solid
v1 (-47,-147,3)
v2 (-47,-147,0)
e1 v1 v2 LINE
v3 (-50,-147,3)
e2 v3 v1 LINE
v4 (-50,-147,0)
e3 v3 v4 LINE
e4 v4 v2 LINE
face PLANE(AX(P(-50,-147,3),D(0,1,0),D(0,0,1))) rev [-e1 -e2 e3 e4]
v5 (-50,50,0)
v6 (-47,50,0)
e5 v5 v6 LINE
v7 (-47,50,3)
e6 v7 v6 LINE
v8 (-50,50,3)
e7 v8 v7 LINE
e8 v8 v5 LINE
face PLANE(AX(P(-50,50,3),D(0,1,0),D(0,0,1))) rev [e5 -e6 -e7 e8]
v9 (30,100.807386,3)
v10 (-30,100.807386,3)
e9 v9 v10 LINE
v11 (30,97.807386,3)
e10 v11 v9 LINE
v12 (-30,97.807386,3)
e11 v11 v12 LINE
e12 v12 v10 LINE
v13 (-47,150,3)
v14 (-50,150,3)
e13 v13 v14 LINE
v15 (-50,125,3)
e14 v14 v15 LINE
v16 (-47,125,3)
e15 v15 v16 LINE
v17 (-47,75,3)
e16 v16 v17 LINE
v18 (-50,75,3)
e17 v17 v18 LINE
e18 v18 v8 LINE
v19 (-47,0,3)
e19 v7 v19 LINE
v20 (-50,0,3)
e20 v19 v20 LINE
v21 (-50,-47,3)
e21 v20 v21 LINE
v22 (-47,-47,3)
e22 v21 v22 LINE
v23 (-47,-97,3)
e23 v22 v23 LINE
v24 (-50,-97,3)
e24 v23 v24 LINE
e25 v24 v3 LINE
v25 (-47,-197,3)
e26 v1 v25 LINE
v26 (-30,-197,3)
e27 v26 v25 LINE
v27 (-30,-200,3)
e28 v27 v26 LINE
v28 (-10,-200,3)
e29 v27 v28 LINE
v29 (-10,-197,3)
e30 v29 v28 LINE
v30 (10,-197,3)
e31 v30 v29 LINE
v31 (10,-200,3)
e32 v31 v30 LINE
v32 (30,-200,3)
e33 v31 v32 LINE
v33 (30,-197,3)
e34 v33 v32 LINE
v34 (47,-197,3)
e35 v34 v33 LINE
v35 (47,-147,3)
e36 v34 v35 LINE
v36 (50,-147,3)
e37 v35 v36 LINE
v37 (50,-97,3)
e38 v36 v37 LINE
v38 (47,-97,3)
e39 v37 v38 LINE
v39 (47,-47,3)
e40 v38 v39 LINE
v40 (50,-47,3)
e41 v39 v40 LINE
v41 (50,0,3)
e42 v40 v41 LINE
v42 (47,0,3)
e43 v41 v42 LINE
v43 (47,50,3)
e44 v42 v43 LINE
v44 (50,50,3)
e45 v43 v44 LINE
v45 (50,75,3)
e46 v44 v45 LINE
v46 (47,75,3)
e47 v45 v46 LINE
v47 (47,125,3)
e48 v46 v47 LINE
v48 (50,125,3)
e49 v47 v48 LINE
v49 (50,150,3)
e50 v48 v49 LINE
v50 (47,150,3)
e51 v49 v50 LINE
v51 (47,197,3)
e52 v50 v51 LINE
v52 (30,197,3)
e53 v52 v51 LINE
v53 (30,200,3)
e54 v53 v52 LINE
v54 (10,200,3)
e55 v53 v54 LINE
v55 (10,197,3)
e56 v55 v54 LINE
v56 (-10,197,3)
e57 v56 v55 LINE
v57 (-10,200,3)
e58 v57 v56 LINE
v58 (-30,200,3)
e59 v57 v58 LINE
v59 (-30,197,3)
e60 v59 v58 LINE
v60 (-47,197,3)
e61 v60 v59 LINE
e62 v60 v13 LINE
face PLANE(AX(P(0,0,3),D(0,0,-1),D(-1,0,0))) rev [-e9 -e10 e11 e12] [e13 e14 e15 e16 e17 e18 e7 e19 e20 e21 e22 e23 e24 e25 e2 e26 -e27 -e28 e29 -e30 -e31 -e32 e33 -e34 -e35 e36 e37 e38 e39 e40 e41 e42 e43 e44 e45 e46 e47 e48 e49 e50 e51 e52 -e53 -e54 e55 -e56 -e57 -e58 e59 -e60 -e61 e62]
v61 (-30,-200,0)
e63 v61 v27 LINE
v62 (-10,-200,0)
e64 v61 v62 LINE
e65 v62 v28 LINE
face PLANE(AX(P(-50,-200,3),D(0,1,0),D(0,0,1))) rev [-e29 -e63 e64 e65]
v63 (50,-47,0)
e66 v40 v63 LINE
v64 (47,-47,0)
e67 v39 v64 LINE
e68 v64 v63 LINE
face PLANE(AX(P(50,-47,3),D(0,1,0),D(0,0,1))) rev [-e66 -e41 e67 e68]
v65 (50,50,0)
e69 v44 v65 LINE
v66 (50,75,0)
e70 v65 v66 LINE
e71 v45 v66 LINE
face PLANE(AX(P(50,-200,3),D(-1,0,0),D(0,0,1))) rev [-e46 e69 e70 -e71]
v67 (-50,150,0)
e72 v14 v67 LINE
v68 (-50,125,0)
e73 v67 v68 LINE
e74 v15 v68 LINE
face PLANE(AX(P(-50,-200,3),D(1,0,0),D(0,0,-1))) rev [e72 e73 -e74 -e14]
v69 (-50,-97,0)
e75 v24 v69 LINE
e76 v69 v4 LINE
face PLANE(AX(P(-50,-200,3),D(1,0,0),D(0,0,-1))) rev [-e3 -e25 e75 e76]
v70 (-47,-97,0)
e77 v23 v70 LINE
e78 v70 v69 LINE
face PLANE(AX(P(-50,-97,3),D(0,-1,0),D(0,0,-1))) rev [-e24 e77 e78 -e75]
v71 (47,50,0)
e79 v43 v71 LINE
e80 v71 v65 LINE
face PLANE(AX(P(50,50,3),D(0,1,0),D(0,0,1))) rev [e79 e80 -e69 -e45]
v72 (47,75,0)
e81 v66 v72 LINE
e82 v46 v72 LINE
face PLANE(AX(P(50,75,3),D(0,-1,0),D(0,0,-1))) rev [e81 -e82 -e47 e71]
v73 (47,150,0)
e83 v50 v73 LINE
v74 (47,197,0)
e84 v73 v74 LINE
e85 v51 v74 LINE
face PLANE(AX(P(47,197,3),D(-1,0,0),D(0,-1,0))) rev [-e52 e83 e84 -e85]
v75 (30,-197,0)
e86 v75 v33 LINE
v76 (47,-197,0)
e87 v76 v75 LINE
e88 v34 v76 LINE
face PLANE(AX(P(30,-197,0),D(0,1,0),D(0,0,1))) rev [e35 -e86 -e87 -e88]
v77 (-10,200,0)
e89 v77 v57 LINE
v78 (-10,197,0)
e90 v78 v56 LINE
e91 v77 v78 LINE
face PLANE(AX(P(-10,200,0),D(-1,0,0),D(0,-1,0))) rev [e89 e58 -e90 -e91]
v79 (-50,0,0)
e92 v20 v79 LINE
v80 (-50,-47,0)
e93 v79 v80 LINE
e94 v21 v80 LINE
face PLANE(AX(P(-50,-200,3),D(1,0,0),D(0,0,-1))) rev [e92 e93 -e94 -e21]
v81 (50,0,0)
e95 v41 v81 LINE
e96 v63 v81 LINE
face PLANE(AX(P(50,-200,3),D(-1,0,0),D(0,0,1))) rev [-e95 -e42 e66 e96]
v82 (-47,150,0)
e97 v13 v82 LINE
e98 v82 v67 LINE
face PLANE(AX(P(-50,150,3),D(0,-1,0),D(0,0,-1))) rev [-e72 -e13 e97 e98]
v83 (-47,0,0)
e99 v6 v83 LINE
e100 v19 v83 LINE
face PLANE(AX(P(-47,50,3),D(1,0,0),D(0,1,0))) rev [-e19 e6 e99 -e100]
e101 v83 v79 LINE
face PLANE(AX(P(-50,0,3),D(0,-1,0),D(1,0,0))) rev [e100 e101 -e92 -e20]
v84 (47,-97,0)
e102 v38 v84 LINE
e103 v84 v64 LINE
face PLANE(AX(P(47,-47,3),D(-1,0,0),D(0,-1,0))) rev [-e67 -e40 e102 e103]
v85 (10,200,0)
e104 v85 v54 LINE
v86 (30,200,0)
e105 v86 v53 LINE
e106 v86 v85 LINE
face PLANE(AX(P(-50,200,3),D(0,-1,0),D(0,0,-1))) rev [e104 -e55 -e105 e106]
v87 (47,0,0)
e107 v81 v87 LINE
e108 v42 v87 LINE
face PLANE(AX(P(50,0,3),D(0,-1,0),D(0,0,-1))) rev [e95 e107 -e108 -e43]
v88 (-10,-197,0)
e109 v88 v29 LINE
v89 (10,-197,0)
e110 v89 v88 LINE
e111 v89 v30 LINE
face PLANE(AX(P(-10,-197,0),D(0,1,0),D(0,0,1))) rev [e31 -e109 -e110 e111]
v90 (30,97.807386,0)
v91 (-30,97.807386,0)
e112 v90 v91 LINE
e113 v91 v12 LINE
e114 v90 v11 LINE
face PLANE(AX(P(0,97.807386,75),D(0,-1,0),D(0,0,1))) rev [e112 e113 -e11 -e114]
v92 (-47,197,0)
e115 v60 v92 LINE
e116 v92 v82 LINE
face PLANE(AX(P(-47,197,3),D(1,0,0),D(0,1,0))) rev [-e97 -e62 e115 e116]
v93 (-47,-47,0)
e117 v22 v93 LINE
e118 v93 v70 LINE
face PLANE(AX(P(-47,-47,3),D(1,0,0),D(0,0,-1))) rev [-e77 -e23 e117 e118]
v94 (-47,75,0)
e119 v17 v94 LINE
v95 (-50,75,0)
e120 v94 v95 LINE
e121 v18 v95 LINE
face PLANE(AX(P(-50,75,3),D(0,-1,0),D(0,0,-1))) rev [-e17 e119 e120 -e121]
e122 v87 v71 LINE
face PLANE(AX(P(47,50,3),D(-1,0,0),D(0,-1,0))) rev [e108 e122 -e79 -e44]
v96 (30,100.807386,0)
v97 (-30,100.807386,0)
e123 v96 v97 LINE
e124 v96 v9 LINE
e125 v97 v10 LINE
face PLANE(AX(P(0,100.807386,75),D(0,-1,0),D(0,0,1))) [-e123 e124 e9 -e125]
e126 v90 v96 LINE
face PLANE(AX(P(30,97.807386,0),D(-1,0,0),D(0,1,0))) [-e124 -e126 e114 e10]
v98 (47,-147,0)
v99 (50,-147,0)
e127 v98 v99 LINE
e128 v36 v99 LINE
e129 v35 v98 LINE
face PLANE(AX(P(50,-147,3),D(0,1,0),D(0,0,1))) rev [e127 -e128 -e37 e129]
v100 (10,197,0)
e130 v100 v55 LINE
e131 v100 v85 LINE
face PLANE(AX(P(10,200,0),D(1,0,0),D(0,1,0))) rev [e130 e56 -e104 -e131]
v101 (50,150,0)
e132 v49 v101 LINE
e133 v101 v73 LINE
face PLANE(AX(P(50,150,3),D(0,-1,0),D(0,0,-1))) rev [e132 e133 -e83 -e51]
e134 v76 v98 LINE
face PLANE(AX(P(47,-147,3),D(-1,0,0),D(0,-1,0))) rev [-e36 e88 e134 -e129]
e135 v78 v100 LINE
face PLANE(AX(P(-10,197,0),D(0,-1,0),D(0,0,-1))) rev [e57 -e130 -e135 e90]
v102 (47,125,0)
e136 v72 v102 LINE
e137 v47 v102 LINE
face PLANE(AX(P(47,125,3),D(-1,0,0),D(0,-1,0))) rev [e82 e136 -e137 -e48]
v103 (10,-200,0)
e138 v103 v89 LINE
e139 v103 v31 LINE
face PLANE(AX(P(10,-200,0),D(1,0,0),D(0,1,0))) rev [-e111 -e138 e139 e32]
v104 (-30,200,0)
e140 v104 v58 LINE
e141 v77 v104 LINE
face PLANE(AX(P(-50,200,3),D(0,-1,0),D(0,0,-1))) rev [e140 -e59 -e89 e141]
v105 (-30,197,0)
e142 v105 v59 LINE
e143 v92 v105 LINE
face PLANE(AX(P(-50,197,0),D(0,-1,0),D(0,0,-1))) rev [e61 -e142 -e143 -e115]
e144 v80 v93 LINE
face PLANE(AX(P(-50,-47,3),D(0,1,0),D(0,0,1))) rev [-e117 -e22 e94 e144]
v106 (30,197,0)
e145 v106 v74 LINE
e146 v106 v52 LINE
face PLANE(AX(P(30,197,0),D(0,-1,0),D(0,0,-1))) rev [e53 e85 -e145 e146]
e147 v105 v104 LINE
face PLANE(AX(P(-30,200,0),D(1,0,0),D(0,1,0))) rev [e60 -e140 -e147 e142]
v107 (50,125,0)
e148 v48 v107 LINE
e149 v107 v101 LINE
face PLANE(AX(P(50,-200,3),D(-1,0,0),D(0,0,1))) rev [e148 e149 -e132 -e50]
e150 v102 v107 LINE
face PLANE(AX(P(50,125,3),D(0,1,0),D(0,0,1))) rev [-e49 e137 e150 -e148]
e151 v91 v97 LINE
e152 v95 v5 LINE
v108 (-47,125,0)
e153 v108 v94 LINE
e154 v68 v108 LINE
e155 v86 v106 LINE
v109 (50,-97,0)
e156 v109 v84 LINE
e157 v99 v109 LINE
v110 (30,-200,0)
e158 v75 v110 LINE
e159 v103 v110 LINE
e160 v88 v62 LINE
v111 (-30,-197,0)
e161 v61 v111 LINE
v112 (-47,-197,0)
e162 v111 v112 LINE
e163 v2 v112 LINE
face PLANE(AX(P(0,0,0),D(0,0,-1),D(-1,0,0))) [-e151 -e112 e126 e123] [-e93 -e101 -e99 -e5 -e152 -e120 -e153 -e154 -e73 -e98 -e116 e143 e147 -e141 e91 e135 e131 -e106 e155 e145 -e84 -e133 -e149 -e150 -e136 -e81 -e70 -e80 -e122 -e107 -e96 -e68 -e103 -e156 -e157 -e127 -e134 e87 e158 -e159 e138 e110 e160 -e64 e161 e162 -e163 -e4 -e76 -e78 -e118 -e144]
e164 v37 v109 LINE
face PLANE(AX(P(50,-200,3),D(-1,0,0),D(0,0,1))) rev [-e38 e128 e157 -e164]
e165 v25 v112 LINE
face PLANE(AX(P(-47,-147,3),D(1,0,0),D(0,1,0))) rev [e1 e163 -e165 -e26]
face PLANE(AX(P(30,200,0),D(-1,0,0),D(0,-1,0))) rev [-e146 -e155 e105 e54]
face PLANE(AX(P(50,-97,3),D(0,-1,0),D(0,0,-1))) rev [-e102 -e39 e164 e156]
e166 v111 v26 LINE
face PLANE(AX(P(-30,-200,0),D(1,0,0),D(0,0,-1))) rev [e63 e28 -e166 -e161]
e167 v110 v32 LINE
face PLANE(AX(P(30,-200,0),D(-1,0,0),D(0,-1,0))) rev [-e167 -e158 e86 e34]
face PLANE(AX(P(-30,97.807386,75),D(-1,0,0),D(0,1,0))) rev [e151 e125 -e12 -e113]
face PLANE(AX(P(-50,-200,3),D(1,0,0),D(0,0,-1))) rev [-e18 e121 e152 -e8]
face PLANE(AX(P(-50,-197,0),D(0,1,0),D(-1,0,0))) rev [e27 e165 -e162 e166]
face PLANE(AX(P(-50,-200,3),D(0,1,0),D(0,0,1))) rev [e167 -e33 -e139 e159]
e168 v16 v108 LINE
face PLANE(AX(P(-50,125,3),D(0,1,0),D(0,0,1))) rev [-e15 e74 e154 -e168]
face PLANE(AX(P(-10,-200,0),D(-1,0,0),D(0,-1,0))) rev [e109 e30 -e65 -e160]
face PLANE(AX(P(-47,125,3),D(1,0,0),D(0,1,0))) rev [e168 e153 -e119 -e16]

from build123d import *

# Parameters (mm, degrees)
SKETCH1_W           = 100
SKETCH1_H           = 400
BOSS_EXTRUDE1_DEPTH = 3
SKETCH2_W           = 20
SKETCH2_H           = 3
CUT_EXTRUDE1_DEPTH  = 3
SKETCH4_W           = 3
SKETCH4_H           = 47
SKETCH4_H_2         = 50
CUT_EXTRUDE2_DEPTH  = 3
CAVITY1_START       = 97.807385879
CAVITY1_OUTLINE_W   = 60
CAVITY1_OUTLINE_H   = 3
CAVITY1_DEPTH       = 3


# Read off the part's stored shape, not the designer's step: Cavity1
with BuildPart() as part:
    # Sketch1 → Boss-Extrude1 (new body)
    with BuildSketch(Plane.XY):
        Rectangle(SKETCH1_W, SKETCH1_H)
    extrude(amount=BOSS_EXTRUDE1_DEPTH)

    # Sketch2 → Cut-Extrude1 (cut)
    with BuildSketch(Plane.XY.offset(3)):
        with Locations((-40, -198.5)):
            Rectangle(SKETCH2_W, SKETCH2_H)
        with Locations((0, -198.5)):
            Rectangle(SKETCH2_W, SKETCH2_H)
        with Locations((40, -198.5)):
            Rectangle(SKETCH2_W, SKETCH2_H)
        with Locations((40, 198.5)):
            Rectangle(SKETCH2_W, SKETCH2_H)
        with Locations((0, 198.5)):
            Rectangle(SKETCH2_W, SKETCH2_H)
        with Locations((-40, 198.5)):
            Rectangle(SKETCH2_W, SKETCH2_H)
    extrude(amount=-CUT_EXTRUDE1_DEPTH, mode=Mode.SUBTRACT)

    # Sketch4 → Cut-Extrude2 (cut)
    with BuildSketch(Plane(origin=(0, 0, 0), x_dir=(-1, 0, 0), z_dir=(0, 0, -1))):
        with Locations((-48.5, 173.5)):
            Rectangle(SKETCH4_W, SKETCH4_H)
        with Locations((-48.5, 25)):
            Rectangle(SKETCH4_W, SKETCH4_H_2)
        with Locations((-48.5, -72)):
            Rectangle(SKETCH4_W, SKETCH4_H_2)
        with Locations((-48.5, -172)):
            Rectangle(SKETCH4_W, SKETCH4_H_2)
        with Locations((48.5, -172)):
            Rectangle(SKETCH4_W, SKETCH4_H_2)
        with Locations((48.5, -72)):
            Rectangle(SKETCH4_W, SKETCH4_H_2)
        with Locations((48.5, 25)):
            Rectangle(SKETCH4_W, SKETCH4_H_2)
        with Locations((48.5, 173.5)):
            Rectangle(SKETCH4_W, SKETCH4_H)
        with Locations((48.5, 100)):
            Rectangle(SKETCH4_W, SKETCH4_H_2)
        with Locations((-48.5, 100)):
            Rectangle(SKETCH4_W, SKETCH4_H_2)
    extrude(amount=-CUT_EXTRUDE2_DEPTH, mode=Mode.SUBTRACT)

    # Cavity1 outline → Cavity1 (cut)
    with BuildSketch(Plane(origin=(0, 0, 0), x_dir=(1, 0, 0), z_dir=(0, 1, 0)).offset(CAVITY1_START)):
        with Locations((0, -1.5)):
            Rectangle(CAVITY1_OUTLINE_W, CAVITY1_OUTLINE_H)
    extrude(amount=CAVITY1_DEPTH, mode=Mode.SUBTRACT)


solid = part.part
